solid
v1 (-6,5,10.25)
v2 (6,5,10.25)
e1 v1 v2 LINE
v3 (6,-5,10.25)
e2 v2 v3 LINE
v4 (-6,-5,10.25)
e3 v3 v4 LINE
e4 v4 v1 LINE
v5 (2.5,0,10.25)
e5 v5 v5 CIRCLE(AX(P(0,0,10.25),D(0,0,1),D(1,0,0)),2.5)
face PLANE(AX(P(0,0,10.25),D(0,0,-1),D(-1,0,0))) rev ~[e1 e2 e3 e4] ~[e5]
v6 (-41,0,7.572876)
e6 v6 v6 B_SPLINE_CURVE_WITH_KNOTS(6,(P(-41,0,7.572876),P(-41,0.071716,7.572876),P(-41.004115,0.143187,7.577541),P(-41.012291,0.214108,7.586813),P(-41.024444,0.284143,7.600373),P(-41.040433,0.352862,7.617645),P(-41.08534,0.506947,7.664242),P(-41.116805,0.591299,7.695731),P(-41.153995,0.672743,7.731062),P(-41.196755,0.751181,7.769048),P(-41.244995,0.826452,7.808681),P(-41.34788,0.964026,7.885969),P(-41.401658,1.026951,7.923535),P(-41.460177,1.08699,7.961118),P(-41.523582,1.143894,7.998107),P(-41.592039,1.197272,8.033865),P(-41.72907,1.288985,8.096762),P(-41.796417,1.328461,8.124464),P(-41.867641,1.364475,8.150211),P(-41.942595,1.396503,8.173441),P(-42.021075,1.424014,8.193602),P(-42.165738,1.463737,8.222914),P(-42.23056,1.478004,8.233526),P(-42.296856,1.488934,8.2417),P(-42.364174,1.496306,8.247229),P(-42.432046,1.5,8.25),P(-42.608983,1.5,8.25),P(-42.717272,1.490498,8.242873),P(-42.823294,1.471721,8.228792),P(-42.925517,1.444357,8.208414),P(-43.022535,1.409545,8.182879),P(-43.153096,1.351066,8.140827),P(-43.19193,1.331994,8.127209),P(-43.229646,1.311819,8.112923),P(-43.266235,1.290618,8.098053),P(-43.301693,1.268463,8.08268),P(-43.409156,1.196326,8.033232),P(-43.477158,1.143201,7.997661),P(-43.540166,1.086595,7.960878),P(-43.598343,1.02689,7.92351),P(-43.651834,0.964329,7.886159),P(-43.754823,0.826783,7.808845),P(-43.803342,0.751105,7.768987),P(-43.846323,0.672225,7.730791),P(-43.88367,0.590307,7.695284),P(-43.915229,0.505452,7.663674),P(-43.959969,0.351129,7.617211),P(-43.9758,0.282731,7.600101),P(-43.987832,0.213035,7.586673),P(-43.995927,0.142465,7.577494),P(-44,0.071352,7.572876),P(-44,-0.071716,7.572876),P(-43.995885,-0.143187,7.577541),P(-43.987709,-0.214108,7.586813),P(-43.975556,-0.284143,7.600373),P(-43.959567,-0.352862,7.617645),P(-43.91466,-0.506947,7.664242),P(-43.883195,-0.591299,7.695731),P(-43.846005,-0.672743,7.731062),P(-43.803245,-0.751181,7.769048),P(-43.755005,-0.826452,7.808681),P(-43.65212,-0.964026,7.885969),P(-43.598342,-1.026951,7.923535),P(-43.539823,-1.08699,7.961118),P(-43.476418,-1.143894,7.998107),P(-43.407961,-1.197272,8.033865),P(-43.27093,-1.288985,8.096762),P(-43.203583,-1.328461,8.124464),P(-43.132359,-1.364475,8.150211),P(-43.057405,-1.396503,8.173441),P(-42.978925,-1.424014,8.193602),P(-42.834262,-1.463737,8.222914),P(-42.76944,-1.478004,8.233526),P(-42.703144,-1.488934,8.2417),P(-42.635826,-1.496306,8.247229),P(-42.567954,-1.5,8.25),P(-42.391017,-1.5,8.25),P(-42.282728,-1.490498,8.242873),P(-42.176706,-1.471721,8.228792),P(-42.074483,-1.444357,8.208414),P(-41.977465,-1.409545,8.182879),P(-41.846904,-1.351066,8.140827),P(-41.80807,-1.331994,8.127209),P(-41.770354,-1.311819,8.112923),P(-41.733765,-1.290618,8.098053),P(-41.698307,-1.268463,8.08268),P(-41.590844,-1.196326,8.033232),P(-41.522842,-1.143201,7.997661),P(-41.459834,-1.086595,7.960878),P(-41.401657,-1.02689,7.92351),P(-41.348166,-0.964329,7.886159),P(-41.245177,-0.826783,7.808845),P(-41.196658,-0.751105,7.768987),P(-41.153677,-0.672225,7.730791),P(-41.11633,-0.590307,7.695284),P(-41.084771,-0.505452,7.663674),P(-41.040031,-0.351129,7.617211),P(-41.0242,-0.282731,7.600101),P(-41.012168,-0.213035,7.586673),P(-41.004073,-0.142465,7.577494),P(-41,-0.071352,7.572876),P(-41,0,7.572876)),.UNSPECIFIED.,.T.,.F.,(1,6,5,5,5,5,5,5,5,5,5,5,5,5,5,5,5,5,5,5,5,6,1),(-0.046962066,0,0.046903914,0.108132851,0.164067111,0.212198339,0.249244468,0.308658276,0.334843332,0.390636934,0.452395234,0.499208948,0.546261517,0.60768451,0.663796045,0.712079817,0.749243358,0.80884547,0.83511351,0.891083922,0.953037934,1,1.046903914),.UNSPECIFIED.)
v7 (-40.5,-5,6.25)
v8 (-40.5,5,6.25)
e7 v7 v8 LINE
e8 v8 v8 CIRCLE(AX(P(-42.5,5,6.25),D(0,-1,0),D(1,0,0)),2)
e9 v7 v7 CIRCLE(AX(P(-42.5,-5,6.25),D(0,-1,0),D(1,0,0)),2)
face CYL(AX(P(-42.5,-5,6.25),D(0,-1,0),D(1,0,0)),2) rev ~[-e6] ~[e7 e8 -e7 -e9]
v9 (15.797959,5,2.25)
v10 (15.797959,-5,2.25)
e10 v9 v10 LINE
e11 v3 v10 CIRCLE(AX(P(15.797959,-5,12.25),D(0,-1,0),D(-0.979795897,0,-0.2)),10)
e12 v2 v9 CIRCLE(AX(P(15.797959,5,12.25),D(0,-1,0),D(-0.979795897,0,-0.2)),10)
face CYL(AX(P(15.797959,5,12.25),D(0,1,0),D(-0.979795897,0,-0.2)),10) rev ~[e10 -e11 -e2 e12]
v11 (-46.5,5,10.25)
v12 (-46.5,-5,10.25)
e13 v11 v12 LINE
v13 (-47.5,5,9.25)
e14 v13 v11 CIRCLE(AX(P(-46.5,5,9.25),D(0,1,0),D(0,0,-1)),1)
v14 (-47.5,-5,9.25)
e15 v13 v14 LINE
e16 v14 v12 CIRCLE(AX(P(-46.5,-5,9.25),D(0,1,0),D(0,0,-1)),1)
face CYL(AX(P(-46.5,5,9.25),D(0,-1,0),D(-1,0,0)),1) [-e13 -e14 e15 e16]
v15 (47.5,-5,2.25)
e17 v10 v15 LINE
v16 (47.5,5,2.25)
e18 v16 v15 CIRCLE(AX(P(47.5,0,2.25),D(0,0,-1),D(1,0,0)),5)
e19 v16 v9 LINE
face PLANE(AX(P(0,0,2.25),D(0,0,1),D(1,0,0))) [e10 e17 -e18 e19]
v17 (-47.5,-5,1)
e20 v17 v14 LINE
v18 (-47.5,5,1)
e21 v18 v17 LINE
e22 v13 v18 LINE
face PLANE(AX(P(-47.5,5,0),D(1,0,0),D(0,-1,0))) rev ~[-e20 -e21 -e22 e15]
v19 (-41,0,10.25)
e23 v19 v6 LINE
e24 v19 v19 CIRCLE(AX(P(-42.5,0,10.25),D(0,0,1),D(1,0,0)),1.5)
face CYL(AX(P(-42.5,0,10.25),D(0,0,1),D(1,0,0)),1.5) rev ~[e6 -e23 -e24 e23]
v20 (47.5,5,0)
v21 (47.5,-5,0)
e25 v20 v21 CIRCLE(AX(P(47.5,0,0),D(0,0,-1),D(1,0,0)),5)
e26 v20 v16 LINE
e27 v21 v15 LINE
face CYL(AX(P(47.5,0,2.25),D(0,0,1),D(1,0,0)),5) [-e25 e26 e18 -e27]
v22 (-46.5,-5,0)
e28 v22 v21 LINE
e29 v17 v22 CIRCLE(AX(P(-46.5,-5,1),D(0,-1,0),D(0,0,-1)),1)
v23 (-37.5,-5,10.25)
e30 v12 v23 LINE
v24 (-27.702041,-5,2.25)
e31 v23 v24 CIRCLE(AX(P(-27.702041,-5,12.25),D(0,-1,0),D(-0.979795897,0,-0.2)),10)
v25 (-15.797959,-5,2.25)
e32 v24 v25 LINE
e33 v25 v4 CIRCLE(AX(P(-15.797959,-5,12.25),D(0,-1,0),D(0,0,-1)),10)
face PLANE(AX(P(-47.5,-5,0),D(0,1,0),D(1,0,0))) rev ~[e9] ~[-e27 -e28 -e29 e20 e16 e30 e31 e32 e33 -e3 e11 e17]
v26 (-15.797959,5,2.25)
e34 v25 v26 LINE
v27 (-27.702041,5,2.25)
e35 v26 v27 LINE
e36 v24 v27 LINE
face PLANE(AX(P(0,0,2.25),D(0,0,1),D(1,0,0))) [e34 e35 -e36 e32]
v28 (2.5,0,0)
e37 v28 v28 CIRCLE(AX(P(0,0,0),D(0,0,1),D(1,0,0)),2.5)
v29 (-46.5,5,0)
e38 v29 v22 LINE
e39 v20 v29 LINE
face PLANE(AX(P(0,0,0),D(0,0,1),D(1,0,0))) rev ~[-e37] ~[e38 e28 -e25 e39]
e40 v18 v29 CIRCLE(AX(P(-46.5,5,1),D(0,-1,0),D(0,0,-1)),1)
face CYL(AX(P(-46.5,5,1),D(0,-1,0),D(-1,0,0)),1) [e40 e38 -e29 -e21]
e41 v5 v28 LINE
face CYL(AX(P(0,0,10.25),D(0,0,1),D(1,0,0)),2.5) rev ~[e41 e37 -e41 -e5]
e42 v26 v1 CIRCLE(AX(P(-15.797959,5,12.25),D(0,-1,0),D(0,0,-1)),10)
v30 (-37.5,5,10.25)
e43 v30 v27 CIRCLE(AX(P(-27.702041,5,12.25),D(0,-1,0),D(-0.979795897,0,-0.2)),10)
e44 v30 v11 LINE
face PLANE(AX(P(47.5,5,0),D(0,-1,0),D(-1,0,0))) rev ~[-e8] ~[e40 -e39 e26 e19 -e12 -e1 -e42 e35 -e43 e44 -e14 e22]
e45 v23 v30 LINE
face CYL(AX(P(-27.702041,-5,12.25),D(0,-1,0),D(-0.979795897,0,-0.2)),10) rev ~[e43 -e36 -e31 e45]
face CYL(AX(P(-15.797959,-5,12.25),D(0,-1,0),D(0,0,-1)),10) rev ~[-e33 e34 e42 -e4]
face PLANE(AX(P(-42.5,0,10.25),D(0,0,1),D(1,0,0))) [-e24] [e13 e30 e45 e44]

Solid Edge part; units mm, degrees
sketch "Sketch1" plane through (0, 0, 0) normal (0, 0, 1) x (1, 0, 0)
  line L0 (-47.5, 5) -> (-47.5, -5)
  line L1 (-47.5, -5) -> (47.5, -5)
  line L2 (47.5, -5) -> (47.5, 5)
  line L3 (47.5, 5) -> (-47.5, 5)
  dimension "D1" = 10
  dimension "D2" = 95
extrude "Ajout_matière_1" add sketch "Sketch1" along normal blind 2.25
sketch "Sketch2" plane through (0, 0, 2.25) normal (0, 0, 1) x (1, 0, 0)
  line L0 (-47.5, 5) -> (-47.5, -5)
  line L1 (-47.5, -5) -> (-37.5, -5)
  line L2 (-37.5, -5) -> (-37.5, 5)
  line L3 (-37.5, 5) -> (-47.5, 5)
  dimension "D1" = 10
extrude "Ajout_matière_2" add sketch "Sketch2" along normal blind 8
sketch "Sketch3" plane through (-42.5, 0, 10.25) normal (0, 0, 1) x (1, 0, 0)
  circle A0 centre (0, 0) radius 1.5
  dimension "D1" = 3
extrude "Enlèvement_matière_1" cut sketch "Sketch3" against normal blind 5
sketch "Sketch4" plane through (0, -5, 6) normal (0, -1, 0) x (1, 0, 0)
  circle A0 centre (-42.5, 0.25) radius 2
  dimension "D1" = 4
extrude "Enlèvement_matière_2" cut sketch "Sketch4" against normal blind 10
sketch "Sketch5" plane through (7.5, 0, 2.25) normal (0, 0, 1) x (1, 0, 0)
  line L0 (-13.5, 5) -> (-1.5, 5)
  line L1 (-1.5, 5) -> (-1.5, -5)
  line L2 (-1.5, -5) -> (-13.5, -5)
  line L3 (-13.5, -5) -> (-13.5, 5)
  dimension "D1" = 12
extrude "Ajout_matière_3" add sketch "Sketch5" along normal blind 8
sketch "Sketch6" plane through (0, 0, 10.25) normal (0, 0, 1) x (1, 0, 0)
  circle A0 centre (0, 0) radius 2.5
extrude "Enlèvement_matière_3" cut sketch "Sketch6" against normal blind 11
fillet "Congé_2" radius 1 2 edges at (-47.5, 0, 0) (-47.5, 0, 10.25)
sketch "Sketch7" plane through (33.649, 0, 2.25) normal (0, 0, 1) x (1, 0, 0)
  line L0 (13.851, 5) -> (13.851, -5)
  arc A0 (13.851, 5) -> (13.851, -5) centre (13.851, 0) cw
extrude "Ajout_matière_4" add sketch "Sketch7" against normal blind 2.25
fillet "Congé_3" radius 10 3 edges at (-37.5, 0, 2.25) (-6, 0, 2.25) (6, 0, 2.25)
properties material "Plastique ABS, haute performance"
